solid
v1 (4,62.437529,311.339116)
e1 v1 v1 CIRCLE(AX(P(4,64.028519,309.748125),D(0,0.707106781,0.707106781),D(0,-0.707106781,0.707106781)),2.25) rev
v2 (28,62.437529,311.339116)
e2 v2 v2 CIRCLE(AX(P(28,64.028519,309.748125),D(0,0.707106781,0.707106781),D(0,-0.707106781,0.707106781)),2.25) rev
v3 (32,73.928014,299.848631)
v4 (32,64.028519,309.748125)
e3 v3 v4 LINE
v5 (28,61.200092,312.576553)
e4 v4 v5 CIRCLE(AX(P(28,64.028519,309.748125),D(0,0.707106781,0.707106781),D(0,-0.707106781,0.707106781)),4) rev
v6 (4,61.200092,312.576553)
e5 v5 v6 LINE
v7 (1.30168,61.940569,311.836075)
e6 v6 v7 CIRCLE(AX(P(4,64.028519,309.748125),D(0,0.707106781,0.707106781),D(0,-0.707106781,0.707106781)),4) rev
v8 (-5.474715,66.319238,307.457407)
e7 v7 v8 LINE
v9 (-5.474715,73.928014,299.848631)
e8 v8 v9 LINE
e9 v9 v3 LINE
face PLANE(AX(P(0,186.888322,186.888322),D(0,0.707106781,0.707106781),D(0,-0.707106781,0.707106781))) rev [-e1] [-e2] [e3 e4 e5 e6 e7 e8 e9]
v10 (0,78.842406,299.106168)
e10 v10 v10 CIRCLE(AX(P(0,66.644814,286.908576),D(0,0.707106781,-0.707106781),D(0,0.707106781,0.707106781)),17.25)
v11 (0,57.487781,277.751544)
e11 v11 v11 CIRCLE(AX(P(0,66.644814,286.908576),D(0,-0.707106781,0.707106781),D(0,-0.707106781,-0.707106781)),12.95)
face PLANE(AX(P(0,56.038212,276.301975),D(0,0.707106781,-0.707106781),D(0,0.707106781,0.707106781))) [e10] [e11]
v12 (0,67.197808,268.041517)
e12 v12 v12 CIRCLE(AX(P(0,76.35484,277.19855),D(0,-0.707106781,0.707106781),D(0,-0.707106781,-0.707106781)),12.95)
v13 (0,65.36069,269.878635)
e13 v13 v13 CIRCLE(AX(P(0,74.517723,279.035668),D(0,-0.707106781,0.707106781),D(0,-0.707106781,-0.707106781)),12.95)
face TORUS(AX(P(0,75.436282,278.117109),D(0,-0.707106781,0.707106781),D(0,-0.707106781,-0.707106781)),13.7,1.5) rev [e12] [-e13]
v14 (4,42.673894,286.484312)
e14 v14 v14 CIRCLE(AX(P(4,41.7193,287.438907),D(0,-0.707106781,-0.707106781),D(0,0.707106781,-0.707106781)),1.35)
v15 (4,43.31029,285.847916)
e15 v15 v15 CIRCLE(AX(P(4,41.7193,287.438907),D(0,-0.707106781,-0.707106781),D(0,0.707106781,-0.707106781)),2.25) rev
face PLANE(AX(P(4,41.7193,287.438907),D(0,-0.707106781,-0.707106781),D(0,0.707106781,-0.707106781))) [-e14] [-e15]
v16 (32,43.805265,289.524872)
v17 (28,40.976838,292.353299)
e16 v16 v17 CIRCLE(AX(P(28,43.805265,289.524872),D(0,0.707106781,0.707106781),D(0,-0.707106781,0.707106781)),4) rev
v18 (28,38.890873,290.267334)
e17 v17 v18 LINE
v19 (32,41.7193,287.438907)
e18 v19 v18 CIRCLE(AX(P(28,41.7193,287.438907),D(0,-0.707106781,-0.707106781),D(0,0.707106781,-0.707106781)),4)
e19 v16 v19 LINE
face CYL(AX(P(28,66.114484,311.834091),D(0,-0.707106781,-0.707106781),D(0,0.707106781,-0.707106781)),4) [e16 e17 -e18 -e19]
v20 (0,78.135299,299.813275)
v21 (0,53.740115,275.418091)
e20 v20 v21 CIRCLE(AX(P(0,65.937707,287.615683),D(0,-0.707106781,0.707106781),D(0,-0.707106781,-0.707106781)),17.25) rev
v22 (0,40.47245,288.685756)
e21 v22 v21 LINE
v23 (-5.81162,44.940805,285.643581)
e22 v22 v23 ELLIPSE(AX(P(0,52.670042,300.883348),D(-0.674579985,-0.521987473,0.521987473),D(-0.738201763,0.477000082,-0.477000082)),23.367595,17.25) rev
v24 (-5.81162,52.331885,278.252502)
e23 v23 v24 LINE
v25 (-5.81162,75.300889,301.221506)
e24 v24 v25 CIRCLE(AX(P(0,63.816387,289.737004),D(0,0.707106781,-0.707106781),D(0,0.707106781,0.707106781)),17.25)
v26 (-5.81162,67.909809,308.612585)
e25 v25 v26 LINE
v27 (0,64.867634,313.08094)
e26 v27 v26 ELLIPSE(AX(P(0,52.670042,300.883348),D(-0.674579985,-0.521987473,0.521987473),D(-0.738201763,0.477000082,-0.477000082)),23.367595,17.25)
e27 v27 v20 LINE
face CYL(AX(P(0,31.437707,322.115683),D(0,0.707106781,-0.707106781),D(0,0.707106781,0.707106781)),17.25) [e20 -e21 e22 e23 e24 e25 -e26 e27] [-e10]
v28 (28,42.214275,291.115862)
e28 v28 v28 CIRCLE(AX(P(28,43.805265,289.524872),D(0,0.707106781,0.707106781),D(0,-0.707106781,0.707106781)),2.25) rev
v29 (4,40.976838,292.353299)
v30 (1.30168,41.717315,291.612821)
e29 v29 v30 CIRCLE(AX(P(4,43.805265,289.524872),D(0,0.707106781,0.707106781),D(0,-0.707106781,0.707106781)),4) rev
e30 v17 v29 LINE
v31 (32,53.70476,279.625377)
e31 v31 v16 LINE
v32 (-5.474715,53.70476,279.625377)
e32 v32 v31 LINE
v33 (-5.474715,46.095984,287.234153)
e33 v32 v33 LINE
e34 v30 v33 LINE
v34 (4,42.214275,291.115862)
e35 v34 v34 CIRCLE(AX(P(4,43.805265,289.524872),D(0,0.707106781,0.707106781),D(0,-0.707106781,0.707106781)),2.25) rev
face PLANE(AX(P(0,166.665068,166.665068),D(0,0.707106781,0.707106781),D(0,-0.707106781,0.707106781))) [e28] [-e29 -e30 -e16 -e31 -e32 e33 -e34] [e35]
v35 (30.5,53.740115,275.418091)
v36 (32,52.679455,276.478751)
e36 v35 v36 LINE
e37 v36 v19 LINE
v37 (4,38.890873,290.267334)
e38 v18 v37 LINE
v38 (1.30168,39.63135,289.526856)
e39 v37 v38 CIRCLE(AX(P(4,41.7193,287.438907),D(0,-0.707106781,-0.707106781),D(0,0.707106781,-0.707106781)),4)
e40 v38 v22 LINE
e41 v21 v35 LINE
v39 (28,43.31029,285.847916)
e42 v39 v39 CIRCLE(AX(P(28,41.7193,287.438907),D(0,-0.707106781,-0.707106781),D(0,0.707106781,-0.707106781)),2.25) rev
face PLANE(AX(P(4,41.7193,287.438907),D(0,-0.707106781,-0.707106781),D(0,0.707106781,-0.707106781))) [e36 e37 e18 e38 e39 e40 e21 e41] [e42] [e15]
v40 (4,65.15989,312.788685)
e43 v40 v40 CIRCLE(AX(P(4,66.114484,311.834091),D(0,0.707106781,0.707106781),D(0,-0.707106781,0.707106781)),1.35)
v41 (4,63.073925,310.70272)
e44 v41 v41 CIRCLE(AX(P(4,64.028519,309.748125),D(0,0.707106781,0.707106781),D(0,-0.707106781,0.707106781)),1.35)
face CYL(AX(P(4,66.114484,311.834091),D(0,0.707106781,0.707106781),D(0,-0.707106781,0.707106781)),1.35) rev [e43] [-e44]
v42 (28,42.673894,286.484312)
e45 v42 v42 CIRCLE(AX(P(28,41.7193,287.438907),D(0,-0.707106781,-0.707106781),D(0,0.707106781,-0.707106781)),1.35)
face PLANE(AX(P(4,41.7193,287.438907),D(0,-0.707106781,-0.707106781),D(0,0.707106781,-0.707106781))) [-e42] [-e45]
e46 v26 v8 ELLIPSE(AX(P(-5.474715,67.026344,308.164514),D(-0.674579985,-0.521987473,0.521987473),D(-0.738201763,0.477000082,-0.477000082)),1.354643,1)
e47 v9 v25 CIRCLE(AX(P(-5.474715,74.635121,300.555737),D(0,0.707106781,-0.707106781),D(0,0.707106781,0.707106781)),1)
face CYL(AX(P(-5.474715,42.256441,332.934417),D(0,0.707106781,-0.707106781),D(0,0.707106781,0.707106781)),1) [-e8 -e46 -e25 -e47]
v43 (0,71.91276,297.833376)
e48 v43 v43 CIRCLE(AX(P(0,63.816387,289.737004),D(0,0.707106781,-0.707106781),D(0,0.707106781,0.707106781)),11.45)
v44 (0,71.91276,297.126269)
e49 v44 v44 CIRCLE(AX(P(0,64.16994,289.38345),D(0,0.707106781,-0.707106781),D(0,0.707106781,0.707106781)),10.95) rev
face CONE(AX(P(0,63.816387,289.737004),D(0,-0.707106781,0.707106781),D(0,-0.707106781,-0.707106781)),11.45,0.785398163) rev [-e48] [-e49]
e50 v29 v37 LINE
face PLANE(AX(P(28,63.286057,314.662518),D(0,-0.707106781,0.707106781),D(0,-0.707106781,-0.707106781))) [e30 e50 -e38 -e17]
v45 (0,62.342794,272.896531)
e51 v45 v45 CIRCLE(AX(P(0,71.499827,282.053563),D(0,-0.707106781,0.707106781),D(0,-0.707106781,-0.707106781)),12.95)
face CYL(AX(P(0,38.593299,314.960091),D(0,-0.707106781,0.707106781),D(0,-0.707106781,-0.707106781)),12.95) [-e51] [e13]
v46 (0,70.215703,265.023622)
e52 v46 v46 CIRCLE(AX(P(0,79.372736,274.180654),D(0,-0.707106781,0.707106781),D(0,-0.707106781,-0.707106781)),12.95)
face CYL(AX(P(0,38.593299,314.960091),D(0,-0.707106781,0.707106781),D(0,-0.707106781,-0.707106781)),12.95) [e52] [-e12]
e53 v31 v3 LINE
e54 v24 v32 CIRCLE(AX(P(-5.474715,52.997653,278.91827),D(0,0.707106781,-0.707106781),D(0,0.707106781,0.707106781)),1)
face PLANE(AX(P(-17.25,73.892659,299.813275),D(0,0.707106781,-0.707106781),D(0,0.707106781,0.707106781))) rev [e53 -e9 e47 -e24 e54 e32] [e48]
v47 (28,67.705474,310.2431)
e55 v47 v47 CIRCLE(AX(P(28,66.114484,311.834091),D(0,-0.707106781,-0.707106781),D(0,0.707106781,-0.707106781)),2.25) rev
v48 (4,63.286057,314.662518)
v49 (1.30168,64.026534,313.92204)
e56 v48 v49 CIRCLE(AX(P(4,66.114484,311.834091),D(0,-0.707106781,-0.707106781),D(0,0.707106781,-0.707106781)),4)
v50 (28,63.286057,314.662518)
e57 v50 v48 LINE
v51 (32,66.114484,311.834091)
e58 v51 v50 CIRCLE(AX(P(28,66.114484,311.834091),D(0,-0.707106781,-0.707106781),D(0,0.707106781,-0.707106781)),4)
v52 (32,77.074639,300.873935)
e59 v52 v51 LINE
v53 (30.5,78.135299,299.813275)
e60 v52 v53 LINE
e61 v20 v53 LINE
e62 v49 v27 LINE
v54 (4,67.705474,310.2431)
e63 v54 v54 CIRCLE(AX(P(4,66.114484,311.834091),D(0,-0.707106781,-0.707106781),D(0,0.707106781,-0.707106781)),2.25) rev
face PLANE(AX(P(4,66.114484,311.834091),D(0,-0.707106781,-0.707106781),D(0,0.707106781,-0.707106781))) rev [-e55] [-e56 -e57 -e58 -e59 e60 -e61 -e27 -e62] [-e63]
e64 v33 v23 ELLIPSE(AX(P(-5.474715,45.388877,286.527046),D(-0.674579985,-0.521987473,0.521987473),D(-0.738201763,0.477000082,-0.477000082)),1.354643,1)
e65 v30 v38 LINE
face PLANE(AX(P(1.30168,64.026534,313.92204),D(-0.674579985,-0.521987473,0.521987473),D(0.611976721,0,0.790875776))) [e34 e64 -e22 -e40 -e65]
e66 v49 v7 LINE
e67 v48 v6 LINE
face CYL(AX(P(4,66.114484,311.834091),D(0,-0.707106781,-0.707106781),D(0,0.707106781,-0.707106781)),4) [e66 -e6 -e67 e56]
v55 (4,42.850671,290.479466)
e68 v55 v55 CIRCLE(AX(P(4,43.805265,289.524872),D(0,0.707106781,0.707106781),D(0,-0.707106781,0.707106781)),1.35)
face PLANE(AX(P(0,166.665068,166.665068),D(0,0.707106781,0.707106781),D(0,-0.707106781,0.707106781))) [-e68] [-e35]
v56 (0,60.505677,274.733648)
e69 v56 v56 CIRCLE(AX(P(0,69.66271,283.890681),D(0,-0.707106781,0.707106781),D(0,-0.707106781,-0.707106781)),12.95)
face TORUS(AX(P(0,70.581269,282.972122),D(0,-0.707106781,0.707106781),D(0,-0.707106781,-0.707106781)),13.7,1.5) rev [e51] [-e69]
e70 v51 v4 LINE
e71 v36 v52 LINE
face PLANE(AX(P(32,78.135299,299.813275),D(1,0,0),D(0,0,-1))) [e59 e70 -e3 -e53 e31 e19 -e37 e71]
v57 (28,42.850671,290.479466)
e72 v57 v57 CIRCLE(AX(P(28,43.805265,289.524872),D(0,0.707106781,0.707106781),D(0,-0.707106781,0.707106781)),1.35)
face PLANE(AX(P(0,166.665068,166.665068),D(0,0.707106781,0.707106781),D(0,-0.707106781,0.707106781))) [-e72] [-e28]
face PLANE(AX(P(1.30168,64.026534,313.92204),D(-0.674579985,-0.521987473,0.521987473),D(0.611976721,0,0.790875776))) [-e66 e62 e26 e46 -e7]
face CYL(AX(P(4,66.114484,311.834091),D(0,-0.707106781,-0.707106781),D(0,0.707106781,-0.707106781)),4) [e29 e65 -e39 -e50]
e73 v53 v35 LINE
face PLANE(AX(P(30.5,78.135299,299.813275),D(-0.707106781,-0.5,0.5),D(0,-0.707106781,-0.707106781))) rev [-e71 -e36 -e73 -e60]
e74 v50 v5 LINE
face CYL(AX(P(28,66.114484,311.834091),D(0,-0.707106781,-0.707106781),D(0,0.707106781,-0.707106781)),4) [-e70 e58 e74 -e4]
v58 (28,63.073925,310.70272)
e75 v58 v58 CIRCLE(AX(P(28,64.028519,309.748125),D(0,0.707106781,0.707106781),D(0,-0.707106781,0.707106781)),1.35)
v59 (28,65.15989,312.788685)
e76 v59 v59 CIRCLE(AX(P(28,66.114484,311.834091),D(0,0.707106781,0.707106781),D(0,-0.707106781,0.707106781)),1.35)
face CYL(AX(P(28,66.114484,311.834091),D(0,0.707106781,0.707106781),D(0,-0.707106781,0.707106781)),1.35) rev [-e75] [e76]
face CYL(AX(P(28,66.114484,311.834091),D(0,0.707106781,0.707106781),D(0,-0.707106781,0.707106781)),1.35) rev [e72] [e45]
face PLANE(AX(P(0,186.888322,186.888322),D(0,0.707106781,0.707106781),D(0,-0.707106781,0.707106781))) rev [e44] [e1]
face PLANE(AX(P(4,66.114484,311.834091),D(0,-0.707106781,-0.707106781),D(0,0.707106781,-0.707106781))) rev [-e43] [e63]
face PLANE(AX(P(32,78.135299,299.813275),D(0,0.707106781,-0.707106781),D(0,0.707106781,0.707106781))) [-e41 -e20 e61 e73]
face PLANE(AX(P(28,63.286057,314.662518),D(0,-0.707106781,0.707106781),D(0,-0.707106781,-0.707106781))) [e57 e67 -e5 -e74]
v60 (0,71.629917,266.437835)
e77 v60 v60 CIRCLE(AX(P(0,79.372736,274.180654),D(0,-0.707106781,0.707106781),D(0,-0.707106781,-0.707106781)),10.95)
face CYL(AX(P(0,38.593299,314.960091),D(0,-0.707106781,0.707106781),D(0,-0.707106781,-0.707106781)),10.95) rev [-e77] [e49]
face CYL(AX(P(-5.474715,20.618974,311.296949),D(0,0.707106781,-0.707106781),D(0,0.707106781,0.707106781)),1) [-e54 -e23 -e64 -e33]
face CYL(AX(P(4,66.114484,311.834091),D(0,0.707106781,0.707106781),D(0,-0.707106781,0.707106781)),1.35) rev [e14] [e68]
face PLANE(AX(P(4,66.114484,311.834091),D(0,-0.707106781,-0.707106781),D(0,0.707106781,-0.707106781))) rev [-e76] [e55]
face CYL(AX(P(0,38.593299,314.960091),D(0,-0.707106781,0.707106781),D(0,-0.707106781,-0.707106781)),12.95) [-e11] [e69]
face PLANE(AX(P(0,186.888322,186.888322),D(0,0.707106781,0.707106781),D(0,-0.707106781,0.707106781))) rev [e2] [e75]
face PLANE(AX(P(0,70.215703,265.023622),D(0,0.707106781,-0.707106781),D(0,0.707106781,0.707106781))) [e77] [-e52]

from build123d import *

# Parameters (mm, degrees)
SKETCH11_R               = 17.249999999999545
BOSS_EXTRUDE2_DEPTH      = 1
BOSS_EXTRUDE1_DEPTH      = 17.25
BOSS_EXTRUDE1_DEPTH_BACK = 17.25
CUT_EXTRUDE1_START       = -14.25
SKETCH8_W                = 52.49999999999948
SKETCH8_H                = 37.00000000000014
CUT_EXTRUDE1_DEPTH       = 28.5
M2_5_CLEARANCE_HOLE1_D   = 2.7
CUT_EXTRUDE2_DEPTH       = 287.9075330139404
MOVE_FACE1_BY            = 0.05
MOVE_FACE1_2_BY          = 0.05
FILLET3_R                = 1
SKETCH13_R               = 10.949999999999743
CUT_EXTRUDE3_DEPTH       = 287.92025460072404
CHAMFER1_SIZE            = 0.5
CHAMFER2_SIZE            = 1.5


# Read off the part's stored shape, not the designer's step: Glue_In_Plug
with BuildPart() as part:
    # Glue_In_Plug outline → Glue_In_Plug (revolve)
    with BuildSketch(Plane(origin=(0, 176.776695297, 176.776695297), x_dir=(1, 0, 0), z_dir=(0, 0.707106781186551, 0.707106781186544))):
        with BuildLine():
            Line((12.95, -137.75), (10.95, -137.75))
            Line((10.95, -137.75), (10.95, -156.75))
            Line((10.95, -156.75), (15, -156.75))
            Line((15, -156.75), (15, -155.75))
            Line((15, -155.75), (12.95, -155.75))
            Line((12.95, -155.75), (12.95, -151.482050808))
            ThreePointArc((12.95, -151.482050808), (12.2, -150.183012702), (12.95, -148.883974596))
            Line((12.95, -148.883974596), (12.95, -144.616025404))
            ThreePointArc((12.95, -144.616025404), (12.2, -143.316987298), (12.95, -142.017949192))
            Line((12.95, -142.017949192), (12.95, -137.75))
        make_face()
    revolve(axis=Axis((0, 176.776695297, 176.776695297), (0, 0.707106781186544, -0.707106781186551)))

    # Sketch11 → Boss-Extrude2 (add)
    with BuildSketch(Plane(origin=(0, -110.13188116980581, 110.13188116980702), x_dir=(1, 0, 0), z_dir=(0, 0.7071067811865438, -0.7071067811865513))):
        with Locations(Location((0, -250, 0), (0, 0, 270))):
            Circle(SKETCH11_R)
    extrude(amount=-BOSS_EXTRUDE2_DEPTH)

    # Sketch6 → Boss-Extrude1 (add, two sides: drawn at the far end of the back side and taken through both)
    with BuildSketch(Plane(origin=(0, 176.7766952966368, 176.77669529663697), x_dir=(-1, 0, 0), z_dir=(0, -0.7071067811865477, -0.7071067811865475)).offset(-BOSS_EXTRUDE1_DEPTH_BACK)):
        with BuildLine():
            Line((-32, -156.75000000000077), (-32.00000000000001, -173.7500000000009))
            ThreePointArc((-32.00000000000001, -173.7500000000009), (-30.828427124746195, -176.5784271247471), (-27.999999999999996, -177.75000000000088))
            Line((-27.999999999999996, -177.75000000000088), (-4.0000000000000036, -177.75000000000088))
            ThreePointArc((-4.0000000000000036, -177.75000000000088), (-2.5528006726860175, -177.47902321084604), (-1.3016800588632904, -176.7028070535119))
            Line((-1.3016800588632904, -176.7028070535119), (17.249999999999545, -159.75000000000082))
            Line((17.249999999999545, -159.75000000000082), (17.249999999999545, -156.75000000000077))
            Line((17.249999999999545, -156.75000000000077), (-32, -156.75000000000077))
        make_face()
    extrude(amount=BOSS_EXTRUDE1_DEPTH + BOSS_EXTRUDE1_DEPTH_BACK)

    # Sketch8 → Cut-Extrude1 (cut)
    with BuildSketch(Plane(origin=(0, 176.7766952966368, 176.77669529663697), x_dir=(-1, 0, 0), z_dir=(0, -0.7071067811865477, -0.7071067811865475)).offset(CUT_EXTRUDE1_START)):
        with Locations((-9.000000000000195, -178.2500000000009)):
            Rectangle(SKETCH8_W, SKETCH8_H)
    extrude(amount=CUT_EXTRUDE1_DEPTH, mode=Mode.SUBTRACT)

    # M2.5 Clearance Hole1 (through all)
    with Locations(Plane(origin=(0, 188.97428727210456, 188.9742872721045), x_dir=(1, 0, 0), z_dir=(0, 0.7071067811865476, 0.7071067811865476))):
        with Locations((4, -173.75), (28, -173.75)):
            Hole(M2_5_CLEARANCE_HOLE1_D / 2)

    # Sketch12 → Cut-Extrude2 (cut, through all)
    with BuildSketch(Plane(origin=(0, -110.838987950992, 110.83898795099203), x_dir=(1, 7e-16, -7e-16), z_dir=(0, 0.7071067811865476, -0.7071067811865476))):
        with BuildLine():
            Line((-17.249999999999545, -250.00000000000088), (-17.249999999999545, -267.24999999999955))
            Line((-17.249999999999545, -267.24999999999955), (0, -267.24999999999955))
            ThreePointArc((-6.1e-16, -267.24999999999955), (-12.197591975467768, -262.1975919754684), (-17.249999999999538, -250.00000000000088))
        make_face()
        with BuildLine():
            Line((-17.249999999999545, -232.7499999999995), (-17.249999999999545, -250.00000000000088))
            ThreePointArc((-17.24999999999954, -250.00000000000088), (-12.197591975468656, -237.80240802453167), (0, -232.7499999999995))
            Line((0, -232.7499999999995), (-17.249999999999545, -232.7499999999995))
        make_face()
    extrude(amount=-CUT_EXTRUDE2_DEPTH, mode=Mode.SUBTRACT)

    # Move Face1: a face moved inward by 0.05
    extrude(part.faces().sort_by_distance((12.658853914, 47.847886018, 285.552961311))[0], amount=MOVE_FACE1_BY, dir=(0, -0.707106781, -0.707106781), mode=Mode.SUBTRACT)

    # Move Face1 2: a face moved inward by 0.05
    extrude(part.faces().sort_by_distance((12.658853914, 68.000429282, 305.705504575))[0], amount=MOVE_FACE1_2_BY, dir=(0, 0.707106781, 0.707106781), mode=Mode.SUBTRACT)

    # Fillet3
    fillet3_edges = [part.edges().sort_by_distance(p)[0] for p in [
        (-9.647408978600675, 71.47175017032276, 302.3048943648676),
        (-9.647408978601732, 51.24849622840657, 282.0816404229506),
    ]]
    fillet(fillet3_edges, radius=FILLET3_R)

    # Sketch13 → Cut-Extrude3 (cut, through all)
    with BuildSketch(Plane(origin=(0, -110.13188116980584, 110.13188116980702), x_dir=(1, 0, 0), z_dir=(0, 0.7071067811865438, -0.7071067811865512))):
        with Locations(Location((0, -250.0000000000001, 0), (0, 0, 90))):
            Circle(SKETCH13_R)
    extrude(amount=-CUT_EXTRUDE3_DEPTH, mode=Mode.SUBTRACT)

    # Chamfer1
    chamfer1_edges = [part.edges().sort_by_distance(p)[0] for p in [
        (-2.01e-15, 71.55920625607847, 297.4798228451817),
    ]]
    chamfer(chamfer1_edges, length=CHAMFER1_SIZE)

    # Chamfer2
    chamfer2_edges = [part.edges().sort_by_distance(p)[0] for p in [
        (32, 65.93770734564494, 287.6156832476289),
    ]]
    chamfer(chamfer2_edges, length=CHAMFER2_SIZE)


solid = part.part
